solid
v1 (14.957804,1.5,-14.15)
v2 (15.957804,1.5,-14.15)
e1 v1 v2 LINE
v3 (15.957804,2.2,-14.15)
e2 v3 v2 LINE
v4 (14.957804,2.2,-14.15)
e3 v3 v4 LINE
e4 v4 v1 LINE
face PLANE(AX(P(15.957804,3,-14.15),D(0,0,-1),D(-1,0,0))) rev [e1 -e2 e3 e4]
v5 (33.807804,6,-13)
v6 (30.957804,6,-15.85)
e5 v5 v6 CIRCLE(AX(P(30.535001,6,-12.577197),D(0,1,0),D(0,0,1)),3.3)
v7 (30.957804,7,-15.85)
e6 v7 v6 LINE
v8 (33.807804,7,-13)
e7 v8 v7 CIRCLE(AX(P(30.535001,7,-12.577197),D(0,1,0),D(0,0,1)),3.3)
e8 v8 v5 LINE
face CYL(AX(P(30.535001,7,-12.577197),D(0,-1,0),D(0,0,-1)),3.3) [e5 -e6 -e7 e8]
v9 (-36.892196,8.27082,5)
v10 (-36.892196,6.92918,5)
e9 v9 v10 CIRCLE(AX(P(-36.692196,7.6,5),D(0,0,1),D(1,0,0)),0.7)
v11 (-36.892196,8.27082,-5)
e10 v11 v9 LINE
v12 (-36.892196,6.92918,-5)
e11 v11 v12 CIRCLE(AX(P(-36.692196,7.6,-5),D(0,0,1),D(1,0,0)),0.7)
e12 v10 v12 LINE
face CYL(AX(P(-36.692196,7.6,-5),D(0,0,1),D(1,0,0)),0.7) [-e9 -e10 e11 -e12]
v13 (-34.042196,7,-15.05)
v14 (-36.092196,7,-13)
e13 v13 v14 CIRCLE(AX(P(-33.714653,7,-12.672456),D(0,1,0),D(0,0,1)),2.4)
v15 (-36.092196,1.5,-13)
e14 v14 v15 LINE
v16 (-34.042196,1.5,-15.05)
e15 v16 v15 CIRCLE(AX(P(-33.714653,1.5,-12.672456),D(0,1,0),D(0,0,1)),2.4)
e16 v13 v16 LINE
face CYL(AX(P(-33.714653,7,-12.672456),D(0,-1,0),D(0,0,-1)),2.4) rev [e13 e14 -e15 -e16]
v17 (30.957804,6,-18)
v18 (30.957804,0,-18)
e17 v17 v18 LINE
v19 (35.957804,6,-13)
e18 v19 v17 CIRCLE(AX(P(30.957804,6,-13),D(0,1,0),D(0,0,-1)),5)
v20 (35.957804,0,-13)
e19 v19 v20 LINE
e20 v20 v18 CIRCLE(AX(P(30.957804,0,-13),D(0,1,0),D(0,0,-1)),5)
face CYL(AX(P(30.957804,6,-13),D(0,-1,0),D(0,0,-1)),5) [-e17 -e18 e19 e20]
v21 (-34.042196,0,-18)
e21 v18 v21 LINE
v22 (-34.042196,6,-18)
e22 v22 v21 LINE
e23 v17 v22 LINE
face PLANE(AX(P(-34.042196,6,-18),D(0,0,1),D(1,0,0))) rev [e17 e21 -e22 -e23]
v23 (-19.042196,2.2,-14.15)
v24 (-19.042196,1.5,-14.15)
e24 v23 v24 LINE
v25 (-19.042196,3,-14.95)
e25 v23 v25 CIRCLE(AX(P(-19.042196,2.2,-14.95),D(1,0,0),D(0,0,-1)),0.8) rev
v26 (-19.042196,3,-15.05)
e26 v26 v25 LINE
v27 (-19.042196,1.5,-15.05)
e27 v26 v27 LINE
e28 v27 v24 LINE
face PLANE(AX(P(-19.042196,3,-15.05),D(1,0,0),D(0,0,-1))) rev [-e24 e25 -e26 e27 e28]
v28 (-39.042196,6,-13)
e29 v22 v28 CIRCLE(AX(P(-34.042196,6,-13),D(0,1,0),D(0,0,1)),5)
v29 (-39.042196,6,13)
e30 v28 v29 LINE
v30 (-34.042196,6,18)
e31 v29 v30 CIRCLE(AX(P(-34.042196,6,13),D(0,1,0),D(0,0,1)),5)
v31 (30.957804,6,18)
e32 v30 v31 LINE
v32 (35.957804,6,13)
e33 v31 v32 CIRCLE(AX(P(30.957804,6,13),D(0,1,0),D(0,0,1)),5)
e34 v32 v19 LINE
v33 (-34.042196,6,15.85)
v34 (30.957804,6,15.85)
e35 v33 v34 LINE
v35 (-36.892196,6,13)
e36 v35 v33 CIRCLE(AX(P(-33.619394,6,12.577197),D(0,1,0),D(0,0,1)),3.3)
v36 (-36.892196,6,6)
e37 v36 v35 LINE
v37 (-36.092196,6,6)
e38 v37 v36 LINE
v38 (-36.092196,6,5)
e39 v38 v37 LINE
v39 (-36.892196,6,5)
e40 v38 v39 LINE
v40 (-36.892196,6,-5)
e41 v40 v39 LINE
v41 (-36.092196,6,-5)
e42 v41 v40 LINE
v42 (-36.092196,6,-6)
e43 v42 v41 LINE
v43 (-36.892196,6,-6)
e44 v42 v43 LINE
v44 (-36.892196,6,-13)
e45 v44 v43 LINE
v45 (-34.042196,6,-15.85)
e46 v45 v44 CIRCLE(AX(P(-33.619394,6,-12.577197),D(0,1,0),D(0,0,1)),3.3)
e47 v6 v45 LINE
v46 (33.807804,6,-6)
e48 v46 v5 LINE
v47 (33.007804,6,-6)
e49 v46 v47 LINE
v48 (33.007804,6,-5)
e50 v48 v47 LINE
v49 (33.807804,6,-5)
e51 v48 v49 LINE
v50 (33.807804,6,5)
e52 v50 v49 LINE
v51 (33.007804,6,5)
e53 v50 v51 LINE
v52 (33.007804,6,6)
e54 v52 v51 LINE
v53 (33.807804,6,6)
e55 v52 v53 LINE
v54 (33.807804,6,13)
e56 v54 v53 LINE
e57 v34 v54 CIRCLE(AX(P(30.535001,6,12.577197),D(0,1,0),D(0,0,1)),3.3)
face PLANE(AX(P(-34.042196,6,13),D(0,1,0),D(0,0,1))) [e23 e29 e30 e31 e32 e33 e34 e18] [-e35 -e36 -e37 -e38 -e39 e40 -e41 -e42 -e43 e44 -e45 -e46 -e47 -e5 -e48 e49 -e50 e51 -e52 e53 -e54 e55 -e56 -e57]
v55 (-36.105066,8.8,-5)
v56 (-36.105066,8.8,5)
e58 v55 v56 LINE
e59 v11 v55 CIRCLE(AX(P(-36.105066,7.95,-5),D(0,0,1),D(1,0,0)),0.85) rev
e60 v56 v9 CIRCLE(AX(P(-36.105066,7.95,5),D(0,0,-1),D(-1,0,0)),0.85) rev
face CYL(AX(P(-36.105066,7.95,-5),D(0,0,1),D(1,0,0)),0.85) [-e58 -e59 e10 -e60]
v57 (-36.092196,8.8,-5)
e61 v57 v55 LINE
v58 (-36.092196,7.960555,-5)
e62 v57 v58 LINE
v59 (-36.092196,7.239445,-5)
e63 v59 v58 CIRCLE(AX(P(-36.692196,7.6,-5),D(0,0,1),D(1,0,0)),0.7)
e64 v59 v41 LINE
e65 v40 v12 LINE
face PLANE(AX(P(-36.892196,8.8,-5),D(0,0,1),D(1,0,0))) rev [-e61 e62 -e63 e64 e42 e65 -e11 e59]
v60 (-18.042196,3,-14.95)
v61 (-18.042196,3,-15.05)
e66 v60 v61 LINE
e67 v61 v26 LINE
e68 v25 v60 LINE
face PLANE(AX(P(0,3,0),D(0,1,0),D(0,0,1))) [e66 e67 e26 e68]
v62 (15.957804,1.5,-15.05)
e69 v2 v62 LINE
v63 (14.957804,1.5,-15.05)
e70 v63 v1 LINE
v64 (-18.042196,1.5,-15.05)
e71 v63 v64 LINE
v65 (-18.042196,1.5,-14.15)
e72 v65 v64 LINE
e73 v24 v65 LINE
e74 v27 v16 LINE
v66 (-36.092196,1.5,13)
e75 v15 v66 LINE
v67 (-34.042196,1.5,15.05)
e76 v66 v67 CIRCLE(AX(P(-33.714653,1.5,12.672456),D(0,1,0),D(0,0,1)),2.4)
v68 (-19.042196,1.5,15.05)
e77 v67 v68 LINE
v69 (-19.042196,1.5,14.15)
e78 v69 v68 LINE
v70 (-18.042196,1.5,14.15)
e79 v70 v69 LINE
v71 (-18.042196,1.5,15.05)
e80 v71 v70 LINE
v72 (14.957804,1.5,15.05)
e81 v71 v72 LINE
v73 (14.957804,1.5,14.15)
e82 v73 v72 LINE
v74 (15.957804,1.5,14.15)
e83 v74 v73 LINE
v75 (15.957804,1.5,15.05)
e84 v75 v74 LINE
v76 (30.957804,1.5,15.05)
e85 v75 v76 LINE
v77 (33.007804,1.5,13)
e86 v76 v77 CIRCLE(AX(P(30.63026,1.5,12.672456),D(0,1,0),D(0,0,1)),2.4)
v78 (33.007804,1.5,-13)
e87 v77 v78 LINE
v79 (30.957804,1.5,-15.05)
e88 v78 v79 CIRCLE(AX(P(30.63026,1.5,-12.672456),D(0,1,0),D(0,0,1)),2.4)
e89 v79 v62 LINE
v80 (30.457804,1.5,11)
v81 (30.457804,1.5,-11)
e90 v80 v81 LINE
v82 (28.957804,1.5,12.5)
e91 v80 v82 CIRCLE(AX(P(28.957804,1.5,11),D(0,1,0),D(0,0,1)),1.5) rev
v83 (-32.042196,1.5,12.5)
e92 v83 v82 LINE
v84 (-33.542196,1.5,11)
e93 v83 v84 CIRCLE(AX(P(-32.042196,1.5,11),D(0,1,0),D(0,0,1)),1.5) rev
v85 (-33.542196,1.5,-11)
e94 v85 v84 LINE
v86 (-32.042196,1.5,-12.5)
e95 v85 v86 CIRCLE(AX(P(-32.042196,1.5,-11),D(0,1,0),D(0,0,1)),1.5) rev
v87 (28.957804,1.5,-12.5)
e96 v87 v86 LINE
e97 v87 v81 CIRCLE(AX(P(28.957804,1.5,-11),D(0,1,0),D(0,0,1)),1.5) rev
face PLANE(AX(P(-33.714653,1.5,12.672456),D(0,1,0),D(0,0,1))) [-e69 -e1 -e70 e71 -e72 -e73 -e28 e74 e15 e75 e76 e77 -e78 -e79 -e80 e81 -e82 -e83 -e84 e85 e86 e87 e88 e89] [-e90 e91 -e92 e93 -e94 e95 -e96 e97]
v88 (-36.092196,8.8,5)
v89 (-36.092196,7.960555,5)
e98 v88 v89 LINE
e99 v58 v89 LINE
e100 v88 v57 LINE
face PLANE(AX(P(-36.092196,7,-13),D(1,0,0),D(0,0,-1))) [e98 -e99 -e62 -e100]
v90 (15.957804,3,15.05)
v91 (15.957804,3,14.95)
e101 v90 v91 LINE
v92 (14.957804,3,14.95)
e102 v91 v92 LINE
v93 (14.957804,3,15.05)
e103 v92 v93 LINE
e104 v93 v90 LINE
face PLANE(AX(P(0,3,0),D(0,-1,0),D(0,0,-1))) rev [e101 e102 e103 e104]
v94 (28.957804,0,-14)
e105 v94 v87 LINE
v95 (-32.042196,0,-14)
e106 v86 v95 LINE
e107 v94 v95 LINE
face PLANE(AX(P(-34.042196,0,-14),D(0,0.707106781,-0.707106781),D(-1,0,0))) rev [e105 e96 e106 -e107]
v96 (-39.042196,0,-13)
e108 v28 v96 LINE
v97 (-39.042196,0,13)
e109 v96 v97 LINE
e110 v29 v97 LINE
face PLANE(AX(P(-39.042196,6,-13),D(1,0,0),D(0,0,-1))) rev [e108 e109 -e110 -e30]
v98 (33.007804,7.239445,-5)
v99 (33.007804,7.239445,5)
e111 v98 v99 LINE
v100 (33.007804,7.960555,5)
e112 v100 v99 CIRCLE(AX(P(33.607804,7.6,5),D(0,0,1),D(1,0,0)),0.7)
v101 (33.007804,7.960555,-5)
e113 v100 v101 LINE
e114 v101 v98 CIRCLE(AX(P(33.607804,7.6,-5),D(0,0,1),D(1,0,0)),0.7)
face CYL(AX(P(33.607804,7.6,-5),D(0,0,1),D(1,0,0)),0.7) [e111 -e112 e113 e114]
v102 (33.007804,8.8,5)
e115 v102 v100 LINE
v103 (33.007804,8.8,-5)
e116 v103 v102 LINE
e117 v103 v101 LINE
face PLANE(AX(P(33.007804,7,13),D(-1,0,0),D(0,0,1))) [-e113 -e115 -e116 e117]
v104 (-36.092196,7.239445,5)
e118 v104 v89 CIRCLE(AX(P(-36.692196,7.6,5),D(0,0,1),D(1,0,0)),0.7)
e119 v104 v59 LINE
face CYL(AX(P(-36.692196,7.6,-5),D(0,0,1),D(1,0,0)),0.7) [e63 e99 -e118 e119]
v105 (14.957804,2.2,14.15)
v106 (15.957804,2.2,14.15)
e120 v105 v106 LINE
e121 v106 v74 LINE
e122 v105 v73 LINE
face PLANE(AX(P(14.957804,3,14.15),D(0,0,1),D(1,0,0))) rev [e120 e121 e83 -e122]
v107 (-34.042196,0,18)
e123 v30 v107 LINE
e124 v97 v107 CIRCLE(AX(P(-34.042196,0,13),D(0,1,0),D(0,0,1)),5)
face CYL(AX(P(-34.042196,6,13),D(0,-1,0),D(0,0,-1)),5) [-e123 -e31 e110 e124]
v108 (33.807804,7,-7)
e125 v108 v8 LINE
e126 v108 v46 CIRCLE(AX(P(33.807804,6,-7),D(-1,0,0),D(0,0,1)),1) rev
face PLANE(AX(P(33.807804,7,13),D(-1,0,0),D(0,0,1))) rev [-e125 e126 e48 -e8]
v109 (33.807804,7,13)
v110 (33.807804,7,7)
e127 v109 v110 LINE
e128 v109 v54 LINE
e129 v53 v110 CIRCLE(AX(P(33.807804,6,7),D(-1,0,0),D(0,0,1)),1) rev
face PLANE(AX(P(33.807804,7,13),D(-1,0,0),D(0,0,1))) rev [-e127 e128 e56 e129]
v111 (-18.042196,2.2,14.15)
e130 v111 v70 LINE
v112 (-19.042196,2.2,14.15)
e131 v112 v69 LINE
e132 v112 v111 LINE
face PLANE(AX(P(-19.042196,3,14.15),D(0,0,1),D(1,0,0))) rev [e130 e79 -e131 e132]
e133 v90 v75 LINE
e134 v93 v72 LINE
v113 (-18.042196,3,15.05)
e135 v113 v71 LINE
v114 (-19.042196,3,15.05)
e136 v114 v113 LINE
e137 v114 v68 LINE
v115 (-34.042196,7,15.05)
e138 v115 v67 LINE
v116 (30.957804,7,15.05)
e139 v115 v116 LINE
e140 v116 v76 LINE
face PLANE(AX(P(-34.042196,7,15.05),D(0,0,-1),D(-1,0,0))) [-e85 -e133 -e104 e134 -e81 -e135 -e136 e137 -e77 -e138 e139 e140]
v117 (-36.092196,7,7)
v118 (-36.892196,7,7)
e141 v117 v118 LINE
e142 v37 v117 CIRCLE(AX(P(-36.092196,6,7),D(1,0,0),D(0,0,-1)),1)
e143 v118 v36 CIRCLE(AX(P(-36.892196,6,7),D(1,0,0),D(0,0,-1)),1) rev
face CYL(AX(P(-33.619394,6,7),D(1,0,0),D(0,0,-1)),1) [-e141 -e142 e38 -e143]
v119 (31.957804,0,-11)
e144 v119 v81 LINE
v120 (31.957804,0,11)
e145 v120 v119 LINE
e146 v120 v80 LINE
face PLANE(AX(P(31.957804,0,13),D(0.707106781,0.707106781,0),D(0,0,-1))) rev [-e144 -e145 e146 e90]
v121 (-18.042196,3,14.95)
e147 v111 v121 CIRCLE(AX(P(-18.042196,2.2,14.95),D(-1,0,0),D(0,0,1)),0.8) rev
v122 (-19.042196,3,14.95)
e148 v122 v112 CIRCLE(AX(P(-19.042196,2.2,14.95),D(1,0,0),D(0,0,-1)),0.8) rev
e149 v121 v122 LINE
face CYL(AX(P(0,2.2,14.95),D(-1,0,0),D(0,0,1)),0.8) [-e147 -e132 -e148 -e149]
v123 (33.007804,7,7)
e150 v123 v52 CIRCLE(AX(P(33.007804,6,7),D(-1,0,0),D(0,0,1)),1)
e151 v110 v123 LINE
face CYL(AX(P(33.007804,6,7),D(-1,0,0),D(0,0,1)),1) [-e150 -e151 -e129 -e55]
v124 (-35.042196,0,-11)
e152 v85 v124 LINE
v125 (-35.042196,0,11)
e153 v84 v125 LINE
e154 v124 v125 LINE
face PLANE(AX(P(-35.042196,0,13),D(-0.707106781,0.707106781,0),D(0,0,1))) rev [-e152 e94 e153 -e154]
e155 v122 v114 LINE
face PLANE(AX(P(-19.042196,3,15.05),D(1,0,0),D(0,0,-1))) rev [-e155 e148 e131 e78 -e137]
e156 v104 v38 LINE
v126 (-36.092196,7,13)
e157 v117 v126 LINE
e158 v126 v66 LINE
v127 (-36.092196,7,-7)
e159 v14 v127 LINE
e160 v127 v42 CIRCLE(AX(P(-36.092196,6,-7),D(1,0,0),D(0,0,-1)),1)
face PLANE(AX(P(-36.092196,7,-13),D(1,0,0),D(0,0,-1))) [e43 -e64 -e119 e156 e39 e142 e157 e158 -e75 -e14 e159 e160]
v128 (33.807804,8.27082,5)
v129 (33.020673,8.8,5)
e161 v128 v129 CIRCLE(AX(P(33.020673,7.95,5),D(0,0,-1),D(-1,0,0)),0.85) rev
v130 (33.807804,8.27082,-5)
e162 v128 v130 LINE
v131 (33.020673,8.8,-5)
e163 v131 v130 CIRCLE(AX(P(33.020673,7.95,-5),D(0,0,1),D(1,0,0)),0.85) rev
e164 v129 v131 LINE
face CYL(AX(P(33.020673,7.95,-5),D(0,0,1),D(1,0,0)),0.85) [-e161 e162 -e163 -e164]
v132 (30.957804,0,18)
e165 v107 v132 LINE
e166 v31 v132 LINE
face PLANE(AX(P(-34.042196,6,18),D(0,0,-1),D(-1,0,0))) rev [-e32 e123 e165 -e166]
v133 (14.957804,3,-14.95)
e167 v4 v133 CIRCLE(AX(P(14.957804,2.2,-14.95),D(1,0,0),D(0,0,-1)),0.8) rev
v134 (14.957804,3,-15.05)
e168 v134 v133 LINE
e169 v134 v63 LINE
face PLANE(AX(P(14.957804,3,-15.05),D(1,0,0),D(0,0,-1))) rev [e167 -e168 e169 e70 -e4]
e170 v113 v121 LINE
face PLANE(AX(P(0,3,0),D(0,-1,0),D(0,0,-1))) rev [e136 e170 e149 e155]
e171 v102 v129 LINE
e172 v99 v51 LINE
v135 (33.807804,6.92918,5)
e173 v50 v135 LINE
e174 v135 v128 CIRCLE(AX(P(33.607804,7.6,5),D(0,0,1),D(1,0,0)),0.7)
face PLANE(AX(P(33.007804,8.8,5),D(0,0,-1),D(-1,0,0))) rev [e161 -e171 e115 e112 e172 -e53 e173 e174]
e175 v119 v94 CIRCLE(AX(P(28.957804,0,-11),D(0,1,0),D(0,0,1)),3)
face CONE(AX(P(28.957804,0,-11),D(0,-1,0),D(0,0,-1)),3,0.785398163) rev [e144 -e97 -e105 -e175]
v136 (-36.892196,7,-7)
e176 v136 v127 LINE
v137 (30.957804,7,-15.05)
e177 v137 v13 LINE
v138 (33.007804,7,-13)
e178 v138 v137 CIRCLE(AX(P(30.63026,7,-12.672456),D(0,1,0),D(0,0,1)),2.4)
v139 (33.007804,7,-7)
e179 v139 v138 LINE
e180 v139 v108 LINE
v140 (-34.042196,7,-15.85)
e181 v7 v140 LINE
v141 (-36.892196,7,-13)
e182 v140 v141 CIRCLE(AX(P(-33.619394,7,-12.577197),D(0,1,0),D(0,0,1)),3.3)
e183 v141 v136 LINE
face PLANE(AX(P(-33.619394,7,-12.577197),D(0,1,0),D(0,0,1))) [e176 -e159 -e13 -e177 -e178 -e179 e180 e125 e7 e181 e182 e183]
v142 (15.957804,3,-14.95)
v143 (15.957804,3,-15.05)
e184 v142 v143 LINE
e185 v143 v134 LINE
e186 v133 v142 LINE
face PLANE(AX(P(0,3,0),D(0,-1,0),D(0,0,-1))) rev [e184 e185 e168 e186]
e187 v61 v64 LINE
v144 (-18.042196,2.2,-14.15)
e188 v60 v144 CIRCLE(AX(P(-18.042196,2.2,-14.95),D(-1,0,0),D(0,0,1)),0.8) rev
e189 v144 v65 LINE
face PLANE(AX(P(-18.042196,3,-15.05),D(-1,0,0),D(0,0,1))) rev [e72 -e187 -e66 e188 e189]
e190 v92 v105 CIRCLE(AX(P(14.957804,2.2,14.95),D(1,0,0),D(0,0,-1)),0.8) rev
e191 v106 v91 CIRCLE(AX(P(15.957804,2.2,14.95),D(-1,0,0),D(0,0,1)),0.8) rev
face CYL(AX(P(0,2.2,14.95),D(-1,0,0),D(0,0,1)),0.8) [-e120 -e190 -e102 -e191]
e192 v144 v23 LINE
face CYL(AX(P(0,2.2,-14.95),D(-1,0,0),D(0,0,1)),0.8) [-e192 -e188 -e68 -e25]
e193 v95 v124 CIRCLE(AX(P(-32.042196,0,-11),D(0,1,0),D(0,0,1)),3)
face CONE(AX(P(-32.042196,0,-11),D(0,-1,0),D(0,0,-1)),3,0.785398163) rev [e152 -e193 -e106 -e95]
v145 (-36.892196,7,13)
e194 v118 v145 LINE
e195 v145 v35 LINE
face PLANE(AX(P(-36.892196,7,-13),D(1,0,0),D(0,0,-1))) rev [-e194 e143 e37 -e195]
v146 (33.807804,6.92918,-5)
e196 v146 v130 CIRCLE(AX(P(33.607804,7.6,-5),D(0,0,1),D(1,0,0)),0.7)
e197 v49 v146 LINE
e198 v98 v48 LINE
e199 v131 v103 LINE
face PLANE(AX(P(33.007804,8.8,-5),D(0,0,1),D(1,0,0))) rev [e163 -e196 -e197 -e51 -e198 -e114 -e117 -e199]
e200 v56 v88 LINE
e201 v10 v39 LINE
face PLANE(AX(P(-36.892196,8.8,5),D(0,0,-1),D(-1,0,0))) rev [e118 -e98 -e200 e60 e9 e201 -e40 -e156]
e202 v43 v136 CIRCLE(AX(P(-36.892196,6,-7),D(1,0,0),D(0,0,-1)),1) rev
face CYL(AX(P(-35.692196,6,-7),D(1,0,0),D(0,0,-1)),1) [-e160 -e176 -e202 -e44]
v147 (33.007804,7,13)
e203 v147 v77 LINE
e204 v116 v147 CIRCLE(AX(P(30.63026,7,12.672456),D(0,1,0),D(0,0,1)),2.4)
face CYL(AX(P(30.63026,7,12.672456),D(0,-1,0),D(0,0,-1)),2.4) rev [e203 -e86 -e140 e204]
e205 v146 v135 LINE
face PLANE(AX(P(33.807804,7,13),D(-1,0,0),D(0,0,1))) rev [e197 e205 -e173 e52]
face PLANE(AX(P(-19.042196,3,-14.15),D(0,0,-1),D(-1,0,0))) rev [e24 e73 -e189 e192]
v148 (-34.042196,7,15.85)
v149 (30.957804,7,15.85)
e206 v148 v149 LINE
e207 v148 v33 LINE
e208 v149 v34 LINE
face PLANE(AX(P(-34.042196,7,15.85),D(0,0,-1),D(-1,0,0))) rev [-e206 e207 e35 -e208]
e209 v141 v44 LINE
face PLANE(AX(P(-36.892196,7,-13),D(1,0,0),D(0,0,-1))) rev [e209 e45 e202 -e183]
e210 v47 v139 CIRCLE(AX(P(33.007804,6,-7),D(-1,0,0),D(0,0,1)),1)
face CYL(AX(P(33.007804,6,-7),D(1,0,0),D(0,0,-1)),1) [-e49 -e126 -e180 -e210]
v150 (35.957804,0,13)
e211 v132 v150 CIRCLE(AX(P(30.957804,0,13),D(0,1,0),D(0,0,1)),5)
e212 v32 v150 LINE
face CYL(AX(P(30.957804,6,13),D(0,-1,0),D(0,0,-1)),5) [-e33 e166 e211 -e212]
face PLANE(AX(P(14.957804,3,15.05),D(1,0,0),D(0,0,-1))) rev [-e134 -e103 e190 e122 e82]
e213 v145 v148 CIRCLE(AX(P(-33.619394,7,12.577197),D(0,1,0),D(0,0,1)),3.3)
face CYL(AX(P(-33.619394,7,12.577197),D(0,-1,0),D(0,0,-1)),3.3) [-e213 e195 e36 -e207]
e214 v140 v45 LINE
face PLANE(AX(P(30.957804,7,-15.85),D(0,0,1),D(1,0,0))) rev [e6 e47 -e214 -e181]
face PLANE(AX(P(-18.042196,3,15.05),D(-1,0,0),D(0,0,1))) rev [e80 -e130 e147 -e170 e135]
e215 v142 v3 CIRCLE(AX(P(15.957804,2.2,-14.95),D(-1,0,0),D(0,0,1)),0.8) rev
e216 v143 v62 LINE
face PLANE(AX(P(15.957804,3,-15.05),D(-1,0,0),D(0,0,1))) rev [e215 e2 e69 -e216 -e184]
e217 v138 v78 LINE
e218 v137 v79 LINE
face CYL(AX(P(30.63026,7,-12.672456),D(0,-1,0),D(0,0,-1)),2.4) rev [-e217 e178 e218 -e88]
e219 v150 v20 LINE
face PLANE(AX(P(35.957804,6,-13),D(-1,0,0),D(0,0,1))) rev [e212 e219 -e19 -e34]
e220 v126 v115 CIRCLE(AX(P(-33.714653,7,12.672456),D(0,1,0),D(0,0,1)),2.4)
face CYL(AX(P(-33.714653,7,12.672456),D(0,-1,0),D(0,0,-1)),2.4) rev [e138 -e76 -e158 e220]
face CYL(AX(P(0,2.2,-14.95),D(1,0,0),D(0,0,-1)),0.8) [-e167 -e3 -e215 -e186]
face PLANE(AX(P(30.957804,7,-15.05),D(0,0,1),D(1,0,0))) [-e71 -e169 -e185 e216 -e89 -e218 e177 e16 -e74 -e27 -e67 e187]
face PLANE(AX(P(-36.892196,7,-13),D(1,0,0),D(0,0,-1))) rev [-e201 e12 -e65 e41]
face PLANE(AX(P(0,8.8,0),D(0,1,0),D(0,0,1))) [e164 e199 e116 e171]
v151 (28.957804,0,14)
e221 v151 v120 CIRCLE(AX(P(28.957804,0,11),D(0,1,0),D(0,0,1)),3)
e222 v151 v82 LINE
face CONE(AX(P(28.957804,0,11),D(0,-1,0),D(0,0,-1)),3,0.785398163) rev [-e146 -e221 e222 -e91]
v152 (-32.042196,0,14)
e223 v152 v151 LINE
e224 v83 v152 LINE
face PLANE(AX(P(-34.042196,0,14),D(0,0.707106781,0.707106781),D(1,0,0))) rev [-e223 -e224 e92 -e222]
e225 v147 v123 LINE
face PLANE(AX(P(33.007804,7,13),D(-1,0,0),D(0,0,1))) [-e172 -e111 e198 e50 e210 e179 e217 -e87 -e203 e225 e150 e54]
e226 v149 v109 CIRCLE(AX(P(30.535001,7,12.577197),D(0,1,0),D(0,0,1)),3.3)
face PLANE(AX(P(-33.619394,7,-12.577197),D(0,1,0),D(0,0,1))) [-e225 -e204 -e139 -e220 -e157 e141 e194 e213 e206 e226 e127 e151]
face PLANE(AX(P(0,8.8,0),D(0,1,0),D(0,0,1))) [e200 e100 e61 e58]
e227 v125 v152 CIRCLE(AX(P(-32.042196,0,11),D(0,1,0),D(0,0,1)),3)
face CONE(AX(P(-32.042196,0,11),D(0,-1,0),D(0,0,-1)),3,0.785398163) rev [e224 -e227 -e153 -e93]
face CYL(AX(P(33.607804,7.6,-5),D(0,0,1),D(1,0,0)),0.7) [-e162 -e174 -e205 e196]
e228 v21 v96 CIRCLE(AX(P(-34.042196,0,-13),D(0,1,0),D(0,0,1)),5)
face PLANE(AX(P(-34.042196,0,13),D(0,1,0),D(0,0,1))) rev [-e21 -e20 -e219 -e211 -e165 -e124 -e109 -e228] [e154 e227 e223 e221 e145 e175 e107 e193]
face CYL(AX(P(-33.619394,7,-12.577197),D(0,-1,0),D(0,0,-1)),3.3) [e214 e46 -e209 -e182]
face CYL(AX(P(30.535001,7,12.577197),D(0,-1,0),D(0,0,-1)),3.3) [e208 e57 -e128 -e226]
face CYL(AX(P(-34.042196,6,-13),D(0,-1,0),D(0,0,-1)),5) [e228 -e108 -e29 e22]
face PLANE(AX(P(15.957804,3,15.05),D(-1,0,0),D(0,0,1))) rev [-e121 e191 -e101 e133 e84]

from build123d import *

# Parameters (mm, degrees)
EXTRUDE_2_DEPTH     = 6
EXTRUDE_4_DEPTH     = 1
SKETCH_7_W          = 0.8
SKETCH_7_H          = 10
EXTRUDE_8_DEPTH     = 2.8
SKETCH_8_R          = 0.7
EXTRUDE_9_DEPTH     = 10
FILLET_1_R          = 0.85
SKETCH_11_W         = 1
SKETCH_11_H         = 1
CUT_EXTRUDE_1_DEPTH = 1.2
FILLET_2_R          = 1
SKETCH_13_W         = 0.8
SKETCH_13_H         = 10
EXTRUDE_10_DEPTH    = 1.8
SKETCH_14_R         = 0.7
EXTRUDE_11_DEPTH    = 10
FILLET_3_R          = 0.85
SKETCH_15_W         = 0.8
SKETCH_15_H         = 1
CUT_EXTRUDE_3_DEPTH = 1
FILLET_4_R          = 1
CUT_EXTRUDE_START   = -4.5
CUT_EXTRUDE_4_DEPTH = 4.5
SKETCH_17_W         = 64
SKETCH_17_H         = 25
CUT_EXTRUDE_5_DEPTH = 1.5
FILLET_5_R          = 1.5
SKETCH_20_W         = 1
SKETCH_20_H         = 0.9
EXTRUDE_14_DEPTH    = 1.5
FILLET_8_R          = 0.8
CHAMFER_3_SIZE      = 1.5


# Some blends are built 0.0001 mm under size
with BuildPart() as part:
    # case 2 → 凸台-拉伸2 (new body)
    with BuildSketch(Plane(origin=(0, 0, 0), x_dir=(1, 0, 0), z_dir=(0, 1, 0))):
        with BuildLine():
            Line((-34.042196447, 18), (30.957803553, 18))
            ThreePointArc((30.957803553, 18), (34.493337459, 16.535533906), (35.957803553, 13))
            Line((35.957803553, 13), (35.957803553, -13))
            ThreePointArc((35.957803553, -13), (34.493337459, -16.535533906), (30.957803553, -18))
            Line((30.957803553, -18), (-34.042196447, -18))
            ThreePointArc((-34.042196447, -18), (-37.577730353, -16.535533906), (-39.042196447, -13))
            Line((-39.042196447, -13), (-39.042196447, 13))
            ThreePointArc((-39.042196447, 13), (-37.577730353, 16.535533906), (-34.042196447, 18))
        make_face()
    extrude(amount=EXTRUDE_2_DEPTH)

    # 草图3 → 凸台-拉伸4 (add)
    with BuildSketch(Plane(origin=(0, 6, 0), x_dir=(1, 0, 0), z_dir=(0, 1, 0))):
        with BuildLine():
            Line((-36.892196447, 13), (-36.892196447, -13))
            ThreePointArc((-36.892196447, -13), (-35.952846076, -14.910649629), (-34.042196447, -15.85))
            Line((-34.042196447, -15.85), (30.957803553, -15.85))
            ThreePointArc((30.957803553, -15.85), (32.868453181, -14.910649629), (33.807803553, -13))
            Line((33.807803553, -13), (33.807803553, 13))
            ThreePointArc((33.807803553, 13), (32.868453181, 14.910649629), (30.957803553, 15.85))
            Line((30.957803553, 15.85), (-34.042196447, 15.85))
            ThreePointArc((-34.042196447, 15.85), (-35.952846076, 14.910649629), (-36.892196447, 13))
        make_face()
        with BuildLine():
            Line((-34.042196447, -15.05), (30.957803553, -15.05))
            ThreePointArc((30.957803553, -15.05), (32.327315928, -14.369512375), (33.007803553, -13))
            Line((33.007803553, -13), (33.007803553, 13))
            ThreePointArc((33.007803553, 13), (32.327315928, 14.369512375), (30.957803553, 15.05))
            Line((30.957803553, 15.05), (-34.042196447, 15.05))
            ThreePointArc((-34.042196447, 15.05), (-35.411708823, 14.369512375), (-36.092196447, 13))
            Line((-36.092196447, 13), (-36.092196447, -13))
            ThreePointArc((-36.092196447, -13), (-35.411708823, -14.369512375), (-34.042196447, -15.05))
        make_face(mode=Mode.SUBTRACT)
    extrude(amount=EXTRUDE_4_DEPTH)

    # 草图7 → 凸台-拉伸8 (add)
    with BuildSketch(Plane(origin=(0, 6, 0), x_dir=(1, 0, 0), z_dir=(0, 1, 0))):
        with Locations((-36.492196447, 0)):
            Rectangle(SKETCH_7_W, SKETCH_7_H)
    extrude(amount=EXTRUDE_8_DEPTH)

    # 草图8 → 凸台-拉伸9 (add)
    with BuildSketch(Plane.XY.offset(5)):
        with Locations((-36.692196447, 7.6)):
            Circle(SKETCH_8_R)
    extrude(amount=-EXTRUDE_9_DEPTH)

    # 圆角1
    # the kernel refuses this fillet: 0.85 mm, written as the material it takes off along each edge
    with BuildSketch(Plane(origin=(-36.892196447, 8.8, 6.967826014), x_dir=(0, -1, 0), z_dir=(0, 0, -1))) as fillet_1_piece_1:
        with BuildLine():
            CenterArc((0.85, -0.787130406), FILLET_1_R, 112.174937704, 67.825062296)
            Line((0, -0.787130406), (-0.017, -0.787130406))
            Line((-0.017, -0.787130406), (-0.017, 0))
            Line((-0.017, 0), (0, 0.017))
            ThreePointArc((0, 0.017), (0.264589803, 0.017), (0.522763199, 0.015742608))
            Line((0.522763199, 0.015742608), (0.529179607, 0))
        make_face()
    extrude(amount=13.935652028, mode=Mode.SUBTRACT)

    # 草图11 → 切除-拉伸1 (cut)
    with BuildSketch(Plane.ZY.offset(36.892196447)):
        with Locations((5.5, 6.5)):
            Rectangle(SKETCH_11_W, SKETCH_11_H)
        with Locations((-5.5, 6.5)):
            Rectangle(SKETCH_11_W, SKETCH_11_H)
    extrude(amount=-CUT_EXTRUDE_1_DEPTH, mode=Mode.SUBTRACT)

    # 圆角2
    fillet_2_edges = [part.edges().sort_by_distance(p)[0] for p in [
        (-36.492196447, 7, 6),
        (-36.492196447, 7, -6),
    ]]
    fillet(fillet_2_edges, radius=FILLET_2_R - 0.0001)  # a hair under: the kernel refuses the full size

    # 草图13 → 凸台-拉伸10 (add)
    with BuildSketch(Plane(origin=(0, 7, 0), x_dir=(1, 0, 0), z_dir=(0, 1, 0))):
        with Locations((33.407803553, 0)):
            Rectangle(SKETCH_13_W, SKETCH_13_H)
    extrude(amount=EXTRUDE_10_DEPTH)

    # 草图14 → 凸台-拉伸11 (add)
    with BuildSketch(Plane.XY.offset(5)):
        with Locations((33.607803553, 7.6)):
            Circle(SKETCH_14_R)
    extrude(amount=-EXTRUDE_11_DEPTH)

    # 圆角3
    # the kernel refuses this fillet: 0.85 mm, written as the material it takes off along each edge
    with BuildSketch(Plane(origin=(33.807803553, 8.8, -6.967826014), x_dir=(0, -1, 0), z_dir=(0, 0, 1))) as fillet_3_piece_1:
        with BuildLine():
            CenterArc((0.85, -0.787130406), FILLET_3_R, 112.174937704, 67.825062296)
            Line((0, -0.787130406), (-0.017, -0.787130406))
            Line((-0.017, -0.787130406), (-0.017, 0))
            Line((-0.017, 0), (0, 0.017))
            ThreePointArc((0, 0.017), (0.264589803, 0.017), (0.522763199, 0.015742608))
            Line((0.522763199, 0.015742608), (0.529179607, 0))
        make_face()
    extrude(amount=13.935652028, mode=Mode.SUBTRACT)

    # 草图15 → 切除-拉伸3 (cut)
    with BuildSketch(Plane(origin=(0, 7, 0), x_dir=(1, 0, 0), z_dir=(0, 1, 0))):
        with Locations((33.407803553, 5.5)):
            Rectangle(SKETCH_15_W, SKETCH_15_H)
        with Locations((33.407803553, -5.5)):
            Rectangle(SKETCH_15_W, SKETCH_15_H)
    extrude(amount=-CUT_EXTRUDE_3_DEPTH, mode=Mode.SUBTRACT)

    # 圆角4
    fillet_4_edges = [part.edges().sort_by_distance(p)[0] for p in [
        (33.407803553, 7, 6),
        (33.407803553, 7, -6),
    ]]
    fillet(fillet_4_edges, radius=FILLET_4_R - 0.0001)  # a hair under: the kernel refuses the full size

    # 草图16 → 切除-拉伸4 (cut)
    with BuildSketch(Plane(origin=(0, 6, 0), x_dir=(1, 0, 0), z_dir=(0, 1, 0)).offset(CUT_EXTRUDE_START)):
        with BuildLine():
            Line((-34.042196447, -15.05), (30.957803553, -15.05))
            ThreePointArc((30.957803553, -15.05), (32.327315928, -14.369512375), (33.007803553, -13))
            Line((33.007803553, -13), (33.007803553, 13))
            ThreePointArc((33.007803553, 13), (32.327315928, 14.369512375), (30.957803553, 15.05))
            Line((30.957803553, 15.05), (-34.042196447, 15.05))
            ThreePointArc((-34.042196447, 15.05), (-35.411708823, 14.369512375), (-36.092196447, 13))
            Line((-36.092196447, 13), (-36.092196447, -13))
            ThreePointArc((-36.092196447, -13), (-35.411708823, -14.369512375), (-34.042196447, -15.05))
        make_face()
    extrude(amount=CUT_EXTRUDE_4_DEPTH, mode=Mode.SUBTRACT)

    # 草图17 → 切除-拉伸5 (cut)
    with BuildSketch(Plane(origin=(0, 1.5, 0), x_dir=(1, 0, 0), z_dir=(0, 1, 0))):
        with Locations((-1.542196447, 0)):
            Rectangle(SKETCH_17_W, SKETCH_17_H)
    extrude(amount=-CUT_EXTRUDE_5_DEPTH, mode=Mode.SUBTRACT)

    # 圆角5
    fillet_5_edges = [part.edges().sort_by_distance(p)[0] for p in [
        (-33.542196447, 0.75, 12.5),
        (-33.542196447, 0.75, -12.5),
        (30.457803553, 0.75, -12.5),
        (30.457803553, 0.75, 12.5),
    ]]
    fillet(fillet_5_edges, radius=FILLET_5_R)

    # 草图20 → 凸台-拉伸14 (add)
    with BuildSketch(Plane(origin=(0, 1.5, 0), x_dir=(1, 0, 0), z_dir=(0, 1, 0))):
        with Locations((-18.542196447, 14.6)):
            Rectangle(SKETCH_20_W, SKETCH_20_H)
        with Locations((15.457803553, 14.6)):
            Rectangle(SKETCH_20_W, SKETCH_20_H)
        with Locations((-18.542196447, -14.6)):
            Rectangle(SKETCH_20_W, SKETCH_20_H)
        with Locations((15.457803553, -14.6)):
            Rectangle(SKETCH_20_W, SKETCH_20_H)
    extrude(amount=EXTRUDE_14_DEPTH)

    # 圆角8
    fillet_8_edges = [part.edges().sort_by_distance(p)[0] for p in [
        (-18.542196447, 3, -14.15),
        (15.457803553, 3, -14.15),
        (-18.542196447, 3, 14.15),
        (15.457803553, 3, 14.15),
    ]]
    fillet(fillet_8_edges, radius=FILLET_8_R)

    # 倒角3
    chamfer_3_edges = [part.edges().sort_by_distance(p)[0] for p in [
        (-1.542196447, 0, -12.5),
        (-33.102856619, 0, -12.060660172),
        (30.018463725, 0, -12.060660172),
        (-33.542196447, 0, 0),
        (30.457803553, 0, 0),
        (-33.102856619, 0, 12.060660172),
        (30.018463725, 0, 12.060660172),
        (-1.542196447, 0, 12.5),
    ]]
    chamfer(chamfer_3_edges, length=CHAMFER_3_SIZE - 0.0001)  # a hair under: the kernel refuses the full size


solid = part.part
